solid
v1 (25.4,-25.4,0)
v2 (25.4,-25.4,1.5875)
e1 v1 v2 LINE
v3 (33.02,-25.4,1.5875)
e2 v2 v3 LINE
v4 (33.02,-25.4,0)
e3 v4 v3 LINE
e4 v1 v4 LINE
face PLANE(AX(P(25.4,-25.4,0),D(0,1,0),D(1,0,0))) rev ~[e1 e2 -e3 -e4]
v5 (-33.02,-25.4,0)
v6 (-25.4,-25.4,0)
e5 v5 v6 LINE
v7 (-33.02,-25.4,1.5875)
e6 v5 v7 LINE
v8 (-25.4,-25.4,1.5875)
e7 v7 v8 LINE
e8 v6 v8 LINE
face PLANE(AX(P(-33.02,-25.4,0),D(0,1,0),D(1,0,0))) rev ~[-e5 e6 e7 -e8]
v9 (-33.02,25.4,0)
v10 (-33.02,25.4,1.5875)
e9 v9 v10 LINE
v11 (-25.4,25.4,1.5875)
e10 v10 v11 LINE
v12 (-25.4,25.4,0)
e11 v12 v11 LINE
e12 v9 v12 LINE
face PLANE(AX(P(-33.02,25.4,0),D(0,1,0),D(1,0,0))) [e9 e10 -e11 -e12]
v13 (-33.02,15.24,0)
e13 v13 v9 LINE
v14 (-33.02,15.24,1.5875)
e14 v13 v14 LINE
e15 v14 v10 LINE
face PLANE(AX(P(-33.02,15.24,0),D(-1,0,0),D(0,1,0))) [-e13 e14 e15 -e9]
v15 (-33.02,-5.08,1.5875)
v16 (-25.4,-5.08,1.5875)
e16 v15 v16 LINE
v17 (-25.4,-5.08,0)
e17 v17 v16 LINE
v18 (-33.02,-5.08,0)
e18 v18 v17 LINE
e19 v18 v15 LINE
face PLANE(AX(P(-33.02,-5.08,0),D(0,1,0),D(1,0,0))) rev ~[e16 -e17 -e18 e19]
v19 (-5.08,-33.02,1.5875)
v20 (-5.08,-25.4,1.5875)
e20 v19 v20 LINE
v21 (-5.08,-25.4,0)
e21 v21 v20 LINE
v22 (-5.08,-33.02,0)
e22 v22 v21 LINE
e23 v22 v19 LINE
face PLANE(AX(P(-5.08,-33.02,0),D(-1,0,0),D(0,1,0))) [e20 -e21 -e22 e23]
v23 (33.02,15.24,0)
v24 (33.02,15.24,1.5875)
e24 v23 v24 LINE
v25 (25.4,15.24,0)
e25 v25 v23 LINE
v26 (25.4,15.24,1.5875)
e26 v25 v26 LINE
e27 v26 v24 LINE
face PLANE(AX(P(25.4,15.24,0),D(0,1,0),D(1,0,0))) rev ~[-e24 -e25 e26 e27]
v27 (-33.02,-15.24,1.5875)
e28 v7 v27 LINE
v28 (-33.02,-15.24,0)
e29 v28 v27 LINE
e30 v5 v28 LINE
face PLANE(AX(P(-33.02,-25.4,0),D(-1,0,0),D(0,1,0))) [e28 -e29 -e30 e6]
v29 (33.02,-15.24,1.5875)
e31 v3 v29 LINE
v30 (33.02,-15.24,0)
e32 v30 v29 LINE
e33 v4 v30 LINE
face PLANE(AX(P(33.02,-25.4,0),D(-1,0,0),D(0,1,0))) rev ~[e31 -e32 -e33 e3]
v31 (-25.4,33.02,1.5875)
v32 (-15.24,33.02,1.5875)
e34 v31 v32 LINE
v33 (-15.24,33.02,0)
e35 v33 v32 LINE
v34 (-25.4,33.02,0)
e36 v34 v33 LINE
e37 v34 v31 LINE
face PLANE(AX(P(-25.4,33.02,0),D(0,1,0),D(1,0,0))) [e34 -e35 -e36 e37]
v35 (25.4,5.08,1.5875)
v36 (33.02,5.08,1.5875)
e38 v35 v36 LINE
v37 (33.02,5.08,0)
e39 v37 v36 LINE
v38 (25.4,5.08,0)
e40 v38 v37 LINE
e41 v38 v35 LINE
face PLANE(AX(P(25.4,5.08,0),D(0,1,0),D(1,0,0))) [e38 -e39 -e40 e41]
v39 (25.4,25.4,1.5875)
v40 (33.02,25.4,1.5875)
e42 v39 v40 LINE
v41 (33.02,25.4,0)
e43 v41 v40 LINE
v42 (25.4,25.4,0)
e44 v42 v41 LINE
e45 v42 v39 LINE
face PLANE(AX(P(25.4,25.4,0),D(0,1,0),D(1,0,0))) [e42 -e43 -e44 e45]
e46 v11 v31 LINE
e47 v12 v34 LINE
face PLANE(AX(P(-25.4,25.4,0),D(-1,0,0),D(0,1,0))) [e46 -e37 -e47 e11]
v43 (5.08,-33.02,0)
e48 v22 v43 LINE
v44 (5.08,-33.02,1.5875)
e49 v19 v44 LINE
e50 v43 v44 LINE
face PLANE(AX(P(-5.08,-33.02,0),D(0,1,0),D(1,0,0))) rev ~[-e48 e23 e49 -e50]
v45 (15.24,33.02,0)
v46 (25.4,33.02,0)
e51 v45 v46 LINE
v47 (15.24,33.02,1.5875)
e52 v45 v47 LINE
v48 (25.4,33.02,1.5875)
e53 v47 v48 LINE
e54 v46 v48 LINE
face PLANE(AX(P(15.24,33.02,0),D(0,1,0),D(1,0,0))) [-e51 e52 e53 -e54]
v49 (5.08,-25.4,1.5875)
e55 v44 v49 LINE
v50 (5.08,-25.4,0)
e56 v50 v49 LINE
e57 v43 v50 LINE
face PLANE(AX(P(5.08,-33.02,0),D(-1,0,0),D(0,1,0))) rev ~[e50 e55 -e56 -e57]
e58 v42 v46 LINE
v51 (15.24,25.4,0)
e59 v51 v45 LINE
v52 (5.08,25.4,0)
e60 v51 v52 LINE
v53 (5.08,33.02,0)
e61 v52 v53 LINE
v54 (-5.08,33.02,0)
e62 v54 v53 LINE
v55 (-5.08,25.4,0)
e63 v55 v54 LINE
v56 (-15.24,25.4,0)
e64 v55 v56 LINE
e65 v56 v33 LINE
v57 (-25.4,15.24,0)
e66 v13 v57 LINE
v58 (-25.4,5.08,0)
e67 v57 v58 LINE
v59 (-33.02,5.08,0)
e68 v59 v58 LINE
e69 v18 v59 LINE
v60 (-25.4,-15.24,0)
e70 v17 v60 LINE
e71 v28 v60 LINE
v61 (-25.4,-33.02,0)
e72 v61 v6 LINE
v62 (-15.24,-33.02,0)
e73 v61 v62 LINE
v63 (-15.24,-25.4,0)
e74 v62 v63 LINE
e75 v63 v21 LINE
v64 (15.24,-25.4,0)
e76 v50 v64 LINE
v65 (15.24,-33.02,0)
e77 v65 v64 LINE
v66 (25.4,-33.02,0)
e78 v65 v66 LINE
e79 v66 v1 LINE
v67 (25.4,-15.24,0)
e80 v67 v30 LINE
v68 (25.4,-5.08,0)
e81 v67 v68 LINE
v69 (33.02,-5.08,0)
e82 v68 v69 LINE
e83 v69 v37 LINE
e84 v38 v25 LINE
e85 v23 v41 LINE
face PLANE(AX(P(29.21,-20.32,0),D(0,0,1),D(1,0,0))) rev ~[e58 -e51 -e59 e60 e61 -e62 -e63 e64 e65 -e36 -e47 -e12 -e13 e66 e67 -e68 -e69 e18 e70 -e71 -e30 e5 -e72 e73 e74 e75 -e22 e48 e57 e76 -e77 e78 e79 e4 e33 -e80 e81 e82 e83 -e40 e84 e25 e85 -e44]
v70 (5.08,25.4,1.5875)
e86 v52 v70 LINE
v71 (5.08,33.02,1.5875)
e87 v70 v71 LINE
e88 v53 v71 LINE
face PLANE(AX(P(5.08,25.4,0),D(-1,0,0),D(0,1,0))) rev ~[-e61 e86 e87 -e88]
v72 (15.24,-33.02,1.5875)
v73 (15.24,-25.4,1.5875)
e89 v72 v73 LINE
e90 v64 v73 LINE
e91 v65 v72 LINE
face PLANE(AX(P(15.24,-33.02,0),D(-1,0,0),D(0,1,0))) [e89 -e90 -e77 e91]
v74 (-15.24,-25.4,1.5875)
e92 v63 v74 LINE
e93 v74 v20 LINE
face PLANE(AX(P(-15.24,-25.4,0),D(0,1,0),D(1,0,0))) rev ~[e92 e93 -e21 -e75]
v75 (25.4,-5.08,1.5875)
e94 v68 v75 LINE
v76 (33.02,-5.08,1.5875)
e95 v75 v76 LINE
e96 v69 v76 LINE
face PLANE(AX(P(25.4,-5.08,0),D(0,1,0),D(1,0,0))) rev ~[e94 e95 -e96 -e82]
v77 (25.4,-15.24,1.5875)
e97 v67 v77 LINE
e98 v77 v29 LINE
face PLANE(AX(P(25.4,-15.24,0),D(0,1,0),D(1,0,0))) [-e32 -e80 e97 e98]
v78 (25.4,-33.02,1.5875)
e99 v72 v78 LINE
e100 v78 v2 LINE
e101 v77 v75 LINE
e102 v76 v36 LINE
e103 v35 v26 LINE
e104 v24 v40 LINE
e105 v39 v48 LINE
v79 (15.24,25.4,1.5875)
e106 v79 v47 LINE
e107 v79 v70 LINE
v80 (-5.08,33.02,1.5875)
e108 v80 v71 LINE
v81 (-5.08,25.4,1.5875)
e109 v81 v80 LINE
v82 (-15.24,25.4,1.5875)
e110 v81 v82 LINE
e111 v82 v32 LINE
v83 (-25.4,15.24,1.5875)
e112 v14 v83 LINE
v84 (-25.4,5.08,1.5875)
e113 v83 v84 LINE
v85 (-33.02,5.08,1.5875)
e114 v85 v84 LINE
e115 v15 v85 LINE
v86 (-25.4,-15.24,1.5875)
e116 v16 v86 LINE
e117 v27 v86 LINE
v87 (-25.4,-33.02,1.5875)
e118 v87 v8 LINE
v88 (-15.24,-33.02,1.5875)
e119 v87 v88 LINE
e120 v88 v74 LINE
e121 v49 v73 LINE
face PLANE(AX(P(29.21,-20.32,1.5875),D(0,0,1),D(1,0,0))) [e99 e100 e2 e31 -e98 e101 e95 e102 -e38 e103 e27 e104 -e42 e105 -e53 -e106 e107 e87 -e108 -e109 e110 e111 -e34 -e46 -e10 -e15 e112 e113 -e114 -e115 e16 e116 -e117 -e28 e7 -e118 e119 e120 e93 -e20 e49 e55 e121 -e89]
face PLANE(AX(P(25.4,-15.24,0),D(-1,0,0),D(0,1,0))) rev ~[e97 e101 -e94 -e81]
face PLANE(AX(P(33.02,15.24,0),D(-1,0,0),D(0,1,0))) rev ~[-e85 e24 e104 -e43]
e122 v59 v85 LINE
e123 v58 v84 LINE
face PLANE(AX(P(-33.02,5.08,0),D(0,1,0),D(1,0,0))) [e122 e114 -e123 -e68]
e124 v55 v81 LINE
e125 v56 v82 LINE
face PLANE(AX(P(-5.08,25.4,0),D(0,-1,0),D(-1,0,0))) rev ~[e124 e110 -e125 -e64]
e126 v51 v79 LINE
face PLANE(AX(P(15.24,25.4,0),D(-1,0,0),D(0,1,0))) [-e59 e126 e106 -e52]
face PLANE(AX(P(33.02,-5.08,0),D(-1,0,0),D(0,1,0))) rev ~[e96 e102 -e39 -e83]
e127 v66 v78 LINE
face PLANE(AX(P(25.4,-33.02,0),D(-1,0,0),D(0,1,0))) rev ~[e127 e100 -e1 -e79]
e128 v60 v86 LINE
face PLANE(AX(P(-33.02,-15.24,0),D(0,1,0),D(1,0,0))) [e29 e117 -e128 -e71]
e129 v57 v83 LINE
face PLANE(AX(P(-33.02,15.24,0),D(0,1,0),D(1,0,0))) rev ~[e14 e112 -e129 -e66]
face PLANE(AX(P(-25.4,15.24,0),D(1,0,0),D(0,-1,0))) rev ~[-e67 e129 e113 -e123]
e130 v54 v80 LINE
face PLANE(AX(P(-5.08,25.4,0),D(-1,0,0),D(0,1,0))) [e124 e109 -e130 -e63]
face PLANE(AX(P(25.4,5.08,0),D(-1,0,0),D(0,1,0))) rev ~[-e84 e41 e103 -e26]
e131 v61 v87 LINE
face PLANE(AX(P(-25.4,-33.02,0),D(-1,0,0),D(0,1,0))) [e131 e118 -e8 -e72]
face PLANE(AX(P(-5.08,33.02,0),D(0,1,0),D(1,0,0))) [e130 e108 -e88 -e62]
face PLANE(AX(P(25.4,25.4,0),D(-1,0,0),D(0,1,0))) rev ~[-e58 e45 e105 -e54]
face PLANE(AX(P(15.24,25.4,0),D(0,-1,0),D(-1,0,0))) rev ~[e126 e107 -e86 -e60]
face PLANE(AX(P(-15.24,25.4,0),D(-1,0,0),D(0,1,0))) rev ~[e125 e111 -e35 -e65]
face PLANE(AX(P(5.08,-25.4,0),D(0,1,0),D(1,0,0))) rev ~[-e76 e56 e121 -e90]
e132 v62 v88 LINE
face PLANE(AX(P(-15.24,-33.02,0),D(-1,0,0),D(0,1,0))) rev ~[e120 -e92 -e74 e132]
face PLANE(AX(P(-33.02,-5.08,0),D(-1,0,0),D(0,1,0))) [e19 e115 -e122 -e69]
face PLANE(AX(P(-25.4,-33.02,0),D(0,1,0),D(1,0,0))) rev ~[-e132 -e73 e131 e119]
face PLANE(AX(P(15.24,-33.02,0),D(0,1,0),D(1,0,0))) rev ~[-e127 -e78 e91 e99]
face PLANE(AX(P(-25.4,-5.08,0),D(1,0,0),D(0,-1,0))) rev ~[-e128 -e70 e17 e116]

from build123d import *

# Parameters (mm, degrees)
F0_W     = 7.62
F0_H     = 10.16
F0_W_2   = 10.16
F0_H_2   = 7.62
F0_W_3   = 10.160000307
F0_W_4   = 7.619999693
F1_DEPTH = 1.5875


# Not quite as in the source:
# - ends of sketch curves that miss each other by under 0.0002 mm in the source are joined


with BuildPart() as f1:
    # F0 (on Top) → F1 (new body)
    with BuildSketch(Plane.XY):
        with Locations((29.21, -20.32)):
            Rectangle(F0_W, F0_H)
        with Locations((20.320000307, -29.21)):
            Rectangle(F0_W_2, F0_H_2)
        with Locations((3.07e-07, -29.21)):
            Rectangle(F0_W_2, F0_H_2)
        with Locations((-20.3199998465, -29.21)):
            Rectangle(F0_W_3, F0_H_2)
        with Locations((-29.2099998465, -20.32)):
            Rectangle(F0_W_4, F0_H)
        with Locations((-29.2099998465, 0)):
            Rectangle(F0_W_4, F0_H)
        with Locations((-29.2099998465, 20.32)):
            Rectangle(F0_W_4, F0_H)
        with Locations((-20.320000307, 29.21)):
            Rectangle(F0_W_2, F0_H_2)
        with Locations((-3.07e-07, 29.21)):
            Rectangle(F0_W_2, F0_H_2)
        with Locations((20.3199998465, 29.21)):
            Rectangle(F0_W_3, F0_H_2)
        with Locations((29.21, 20.32)):
            Rectangle(F0_W, F0_H)
        Polygon((25.4, 15.24), (25.4, 25.4), (15.239999693, 25.4), (5.079999693, 25.4), (-5.080000307, 25.4), (-15.240000307, 25.4), (-25.4, 25.4), (-25.4, 15.24), (-25.4, 5.08), (-25.4, -5.08), (-25.4, -15.24), (-25.4, -25.4), (-15.239999693, -25.4), (-5.079999693, -25.4), (5.080000307, -25.4), (15.240000307, -25.4), (25.4, -25.4), (25.4, -15.24), (25.4, -5.08), (25.4, 5.08), align=None)
        with Locations((29.21, 0)):
            Rectangle(F0_W, F0_H)
    extrude(amount=F1_DEPTH)


solid = f1.part
